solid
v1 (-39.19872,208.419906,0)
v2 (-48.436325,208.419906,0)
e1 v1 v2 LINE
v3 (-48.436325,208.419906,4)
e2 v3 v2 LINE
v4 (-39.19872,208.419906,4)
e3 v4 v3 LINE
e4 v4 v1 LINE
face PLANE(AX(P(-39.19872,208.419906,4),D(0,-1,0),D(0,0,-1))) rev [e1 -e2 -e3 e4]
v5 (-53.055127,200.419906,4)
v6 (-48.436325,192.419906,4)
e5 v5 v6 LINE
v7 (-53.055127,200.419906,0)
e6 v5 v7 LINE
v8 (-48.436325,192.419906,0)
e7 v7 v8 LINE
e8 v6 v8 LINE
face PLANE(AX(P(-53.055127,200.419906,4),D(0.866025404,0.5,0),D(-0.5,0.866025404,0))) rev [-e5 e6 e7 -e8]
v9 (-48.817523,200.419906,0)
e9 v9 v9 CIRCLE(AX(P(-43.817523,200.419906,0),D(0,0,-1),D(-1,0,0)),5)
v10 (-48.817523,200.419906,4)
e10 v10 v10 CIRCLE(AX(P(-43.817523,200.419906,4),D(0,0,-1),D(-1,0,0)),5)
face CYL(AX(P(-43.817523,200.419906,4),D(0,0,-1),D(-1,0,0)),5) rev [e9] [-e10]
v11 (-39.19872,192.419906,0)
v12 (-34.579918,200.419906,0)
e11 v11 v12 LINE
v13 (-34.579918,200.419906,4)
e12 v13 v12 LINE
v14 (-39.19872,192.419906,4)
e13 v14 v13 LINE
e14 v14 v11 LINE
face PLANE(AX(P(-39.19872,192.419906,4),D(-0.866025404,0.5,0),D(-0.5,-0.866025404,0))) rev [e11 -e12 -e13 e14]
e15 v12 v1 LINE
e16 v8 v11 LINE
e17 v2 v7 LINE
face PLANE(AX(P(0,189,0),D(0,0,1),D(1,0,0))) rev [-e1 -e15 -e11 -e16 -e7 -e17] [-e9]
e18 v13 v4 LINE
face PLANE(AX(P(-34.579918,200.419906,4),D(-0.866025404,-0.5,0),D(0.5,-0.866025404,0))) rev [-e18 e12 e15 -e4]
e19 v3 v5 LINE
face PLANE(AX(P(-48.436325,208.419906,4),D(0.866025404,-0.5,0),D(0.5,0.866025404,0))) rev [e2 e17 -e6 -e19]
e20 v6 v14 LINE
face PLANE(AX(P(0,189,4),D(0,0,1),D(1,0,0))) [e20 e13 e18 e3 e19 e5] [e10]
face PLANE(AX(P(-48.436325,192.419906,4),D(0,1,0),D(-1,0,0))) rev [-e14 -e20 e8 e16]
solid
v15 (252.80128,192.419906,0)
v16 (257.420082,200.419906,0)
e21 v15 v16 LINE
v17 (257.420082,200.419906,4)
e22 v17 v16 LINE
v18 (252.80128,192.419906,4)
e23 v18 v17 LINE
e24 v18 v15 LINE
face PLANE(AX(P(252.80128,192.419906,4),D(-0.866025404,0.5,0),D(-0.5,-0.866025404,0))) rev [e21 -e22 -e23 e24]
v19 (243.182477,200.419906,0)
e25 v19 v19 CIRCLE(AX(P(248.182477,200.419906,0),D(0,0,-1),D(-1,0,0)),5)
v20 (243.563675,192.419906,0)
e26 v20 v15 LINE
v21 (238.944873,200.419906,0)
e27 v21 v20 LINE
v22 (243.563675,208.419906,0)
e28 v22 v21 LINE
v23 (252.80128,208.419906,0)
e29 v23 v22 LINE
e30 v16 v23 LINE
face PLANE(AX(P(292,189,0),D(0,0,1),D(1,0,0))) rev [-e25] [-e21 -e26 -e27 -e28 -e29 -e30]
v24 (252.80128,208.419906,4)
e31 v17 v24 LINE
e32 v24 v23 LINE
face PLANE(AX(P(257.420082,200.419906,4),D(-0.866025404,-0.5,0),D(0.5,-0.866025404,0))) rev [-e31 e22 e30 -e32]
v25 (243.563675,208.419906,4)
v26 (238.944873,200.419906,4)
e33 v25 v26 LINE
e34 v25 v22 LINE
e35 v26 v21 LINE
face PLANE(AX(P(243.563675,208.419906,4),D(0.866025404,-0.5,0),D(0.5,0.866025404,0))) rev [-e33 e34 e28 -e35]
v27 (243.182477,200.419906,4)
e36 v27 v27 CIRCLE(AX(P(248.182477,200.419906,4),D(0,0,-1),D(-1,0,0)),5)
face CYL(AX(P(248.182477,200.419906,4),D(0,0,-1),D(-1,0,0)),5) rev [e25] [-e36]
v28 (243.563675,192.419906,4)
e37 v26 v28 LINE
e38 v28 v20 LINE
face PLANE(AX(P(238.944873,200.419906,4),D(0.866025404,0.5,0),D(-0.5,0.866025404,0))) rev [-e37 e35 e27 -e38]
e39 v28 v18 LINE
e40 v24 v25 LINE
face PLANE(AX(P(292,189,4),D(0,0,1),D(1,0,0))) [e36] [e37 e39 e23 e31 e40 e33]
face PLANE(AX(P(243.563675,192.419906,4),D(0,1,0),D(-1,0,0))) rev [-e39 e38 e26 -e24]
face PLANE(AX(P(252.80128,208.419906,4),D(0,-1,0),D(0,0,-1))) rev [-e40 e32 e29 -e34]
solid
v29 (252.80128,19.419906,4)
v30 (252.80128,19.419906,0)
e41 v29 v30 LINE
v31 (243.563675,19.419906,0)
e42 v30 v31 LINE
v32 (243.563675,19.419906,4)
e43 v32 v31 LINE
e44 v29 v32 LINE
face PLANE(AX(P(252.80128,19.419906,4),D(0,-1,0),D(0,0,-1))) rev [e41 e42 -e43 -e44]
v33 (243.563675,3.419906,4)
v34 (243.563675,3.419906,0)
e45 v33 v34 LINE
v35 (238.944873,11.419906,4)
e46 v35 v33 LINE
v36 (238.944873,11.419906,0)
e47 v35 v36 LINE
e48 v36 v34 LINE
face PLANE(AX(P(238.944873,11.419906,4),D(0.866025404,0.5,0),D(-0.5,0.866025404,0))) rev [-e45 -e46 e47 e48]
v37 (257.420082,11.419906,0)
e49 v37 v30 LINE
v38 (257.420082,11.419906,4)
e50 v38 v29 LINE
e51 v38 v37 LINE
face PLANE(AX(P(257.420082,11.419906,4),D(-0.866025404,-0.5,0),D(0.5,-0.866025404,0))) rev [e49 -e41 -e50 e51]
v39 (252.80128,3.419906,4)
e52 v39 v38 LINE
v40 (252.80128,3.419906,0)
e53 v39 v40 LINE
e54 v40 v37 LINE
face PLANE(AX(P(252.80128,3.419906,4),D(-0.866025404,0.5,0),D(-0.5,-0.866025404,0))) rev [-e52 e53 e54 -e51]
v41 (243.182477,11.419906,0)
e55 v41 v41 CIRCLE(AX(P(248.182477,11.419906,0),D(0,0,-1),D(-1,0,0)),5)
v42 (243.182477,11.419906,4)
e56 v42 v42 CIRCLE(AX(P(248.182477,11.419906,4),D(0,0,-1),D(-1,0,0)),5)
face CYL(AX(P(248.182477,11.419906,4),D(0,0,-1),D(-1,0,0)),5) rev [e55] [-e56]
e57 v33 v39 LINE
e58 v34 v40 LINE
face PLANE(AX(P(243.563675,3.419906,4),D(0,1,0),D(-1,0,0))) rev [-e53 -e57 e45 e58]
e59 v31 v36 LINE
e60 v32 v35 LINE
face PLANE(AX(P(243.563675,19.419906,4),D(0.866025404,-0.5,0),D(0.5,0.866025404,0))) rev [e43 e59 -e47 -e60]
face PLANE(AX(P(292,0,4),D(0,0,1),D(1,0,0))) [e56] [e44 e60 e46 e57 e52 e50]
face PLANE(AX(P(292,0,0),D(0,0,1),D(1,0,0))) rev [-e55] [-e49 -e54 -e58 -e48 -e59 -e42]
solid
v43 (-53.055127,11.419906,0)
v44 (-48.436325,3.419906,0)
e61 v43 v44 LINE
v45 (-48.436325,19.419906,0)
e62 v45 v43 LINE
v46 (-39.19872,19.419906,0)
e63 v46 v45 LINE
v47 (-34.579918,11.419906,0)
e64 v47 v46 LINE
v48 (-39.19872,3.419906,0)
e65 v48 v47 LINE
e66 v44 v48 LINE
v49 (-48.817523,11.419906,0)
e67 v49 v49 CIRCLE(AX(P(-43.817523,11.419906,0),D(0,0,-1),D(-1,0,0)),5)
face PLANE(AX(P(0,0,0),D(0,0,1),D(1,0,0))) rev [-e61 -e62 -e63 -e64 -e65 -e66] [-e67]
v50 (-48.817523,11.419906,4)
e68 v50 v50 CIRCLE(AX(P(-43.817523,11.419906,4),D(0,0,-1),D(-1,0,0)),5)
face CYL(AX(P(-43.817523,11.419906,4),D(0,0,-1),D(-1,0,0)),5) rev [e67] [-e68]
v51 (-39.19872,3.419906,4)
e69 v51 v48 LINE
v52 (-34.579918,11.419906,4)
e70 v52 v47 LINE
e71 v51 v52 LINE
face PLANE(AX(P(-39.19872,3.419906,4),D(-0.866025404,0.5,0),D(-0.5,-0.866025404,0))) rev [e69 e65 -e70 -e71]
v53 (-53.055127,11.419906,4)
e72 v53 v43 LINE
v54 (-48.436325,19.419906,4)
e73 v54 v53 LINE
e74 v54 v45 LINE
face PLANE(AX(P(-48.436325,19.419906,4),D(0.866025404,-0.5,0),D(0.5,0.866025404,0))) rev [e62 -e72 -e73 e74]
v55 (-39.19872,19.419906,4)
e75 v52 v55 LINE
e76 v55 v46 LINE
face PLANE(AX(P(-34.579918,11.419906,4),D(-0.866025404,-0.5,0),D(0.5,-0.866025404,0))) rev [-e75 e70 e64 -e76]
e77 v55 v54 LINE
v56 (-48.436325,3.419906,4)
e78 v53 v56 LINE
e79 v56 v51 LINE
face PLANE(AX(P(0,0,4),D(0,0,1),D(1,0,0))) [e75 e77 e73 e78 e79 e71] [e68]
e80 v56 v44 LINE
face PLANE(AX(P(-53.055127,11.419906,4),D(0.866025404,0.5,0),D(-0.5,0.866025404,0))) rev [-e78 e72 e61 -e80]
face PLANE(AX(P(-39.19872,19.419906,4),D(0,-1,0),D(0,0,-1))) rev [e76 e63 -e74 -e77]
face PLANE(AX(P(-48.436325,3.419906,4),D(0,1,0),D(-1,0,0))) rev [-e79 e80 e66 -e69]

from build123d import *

# Parameters (mm, degrees)
EXTRUDE_1_DEPTH       = 4
SKETCH_3_R            = 5
CUT_EXTRUDE_1_DEPTH   = 57.639025662
MOVE_BODY_2_OUTLINE_R = 5
MOVE_BODY_2_DEPTH     = 4


# Read off the part's stored shape, not the designer's step: 实体-移动/复制2
with BuildPart() as part:
    # 草图2 → 凸台-拉伸1 (new body)
    with BuildSketch(Plane.XY):
        Polygon((-34.579918313, 11.419905632), (-39.198720466, 19.419905632), (-48.436324773, 19.419905632), (-53.055126927, 11.419905632), (-48.436324773, 3.419905632), (-39.198720466, 3.419905632), align=None)
    extrude(amount=EXTRUDE_1_DEPTH)

    # 草图3 → 切除-拉伸1 (cut, through all)
    with BuildSketch(Plane(origin=(0, 0, 0), x_dir=(-1, 0, 0), z_dir=(0, 0, -1))):
        with Locations((43.81752262, 11.419905632)):
            Circle(SKETCH_3_R)
    extrude(amount=-CUT_EXTRUDE_1_DEPTH, mode=Mode.SUBTRACT)


with BuildPart() as body_2:
    # Move Body 1: copy of part
    add(part.part.moved(Location((0, 189, 0))))


with BuildPart() as body_3:
    # Move Body 2 outline → Move Body 2 (new body)
    # profile 1 of 2: a face of its own
    with BuildSketch(Plane.XY):
        Polygon((252.801279534, 3.419905632), (257.420081687, 11.419905632), (252.801279534, 19.419905632), (243.563675227, 19.419905632), (238.944873073, 11.419905632), (243.563675227, 3.419905632), align=None)
        with Locations((248.18247738, 11.419905632)):
            Circle(MOVE_BODY_2_OUTLINE_R, mode=Mode.SUBTRACT)
    # profile 2 of 2: a face of its own
    with BuildSketch(Plane.XY):
        Polygon((252.801279534, 192.419905632), (257.420081687, 200.419905632), (252.801279534, 208.419905632), (243.563675227, 208.419905632), (238.944873073, 200.419905632), (243.563675227, 192.419905632), align=None)
        with Locations((248.18247738, 200.419905632)):
            Circle(MOVE_BODY_2_OUTLINE_R, mode=Mode.SUBTRACT)
    extrude(amount=MOVE_BODY_2_DEPTH)


solid = Compound([part.part, body_2.part, body_3.part])
